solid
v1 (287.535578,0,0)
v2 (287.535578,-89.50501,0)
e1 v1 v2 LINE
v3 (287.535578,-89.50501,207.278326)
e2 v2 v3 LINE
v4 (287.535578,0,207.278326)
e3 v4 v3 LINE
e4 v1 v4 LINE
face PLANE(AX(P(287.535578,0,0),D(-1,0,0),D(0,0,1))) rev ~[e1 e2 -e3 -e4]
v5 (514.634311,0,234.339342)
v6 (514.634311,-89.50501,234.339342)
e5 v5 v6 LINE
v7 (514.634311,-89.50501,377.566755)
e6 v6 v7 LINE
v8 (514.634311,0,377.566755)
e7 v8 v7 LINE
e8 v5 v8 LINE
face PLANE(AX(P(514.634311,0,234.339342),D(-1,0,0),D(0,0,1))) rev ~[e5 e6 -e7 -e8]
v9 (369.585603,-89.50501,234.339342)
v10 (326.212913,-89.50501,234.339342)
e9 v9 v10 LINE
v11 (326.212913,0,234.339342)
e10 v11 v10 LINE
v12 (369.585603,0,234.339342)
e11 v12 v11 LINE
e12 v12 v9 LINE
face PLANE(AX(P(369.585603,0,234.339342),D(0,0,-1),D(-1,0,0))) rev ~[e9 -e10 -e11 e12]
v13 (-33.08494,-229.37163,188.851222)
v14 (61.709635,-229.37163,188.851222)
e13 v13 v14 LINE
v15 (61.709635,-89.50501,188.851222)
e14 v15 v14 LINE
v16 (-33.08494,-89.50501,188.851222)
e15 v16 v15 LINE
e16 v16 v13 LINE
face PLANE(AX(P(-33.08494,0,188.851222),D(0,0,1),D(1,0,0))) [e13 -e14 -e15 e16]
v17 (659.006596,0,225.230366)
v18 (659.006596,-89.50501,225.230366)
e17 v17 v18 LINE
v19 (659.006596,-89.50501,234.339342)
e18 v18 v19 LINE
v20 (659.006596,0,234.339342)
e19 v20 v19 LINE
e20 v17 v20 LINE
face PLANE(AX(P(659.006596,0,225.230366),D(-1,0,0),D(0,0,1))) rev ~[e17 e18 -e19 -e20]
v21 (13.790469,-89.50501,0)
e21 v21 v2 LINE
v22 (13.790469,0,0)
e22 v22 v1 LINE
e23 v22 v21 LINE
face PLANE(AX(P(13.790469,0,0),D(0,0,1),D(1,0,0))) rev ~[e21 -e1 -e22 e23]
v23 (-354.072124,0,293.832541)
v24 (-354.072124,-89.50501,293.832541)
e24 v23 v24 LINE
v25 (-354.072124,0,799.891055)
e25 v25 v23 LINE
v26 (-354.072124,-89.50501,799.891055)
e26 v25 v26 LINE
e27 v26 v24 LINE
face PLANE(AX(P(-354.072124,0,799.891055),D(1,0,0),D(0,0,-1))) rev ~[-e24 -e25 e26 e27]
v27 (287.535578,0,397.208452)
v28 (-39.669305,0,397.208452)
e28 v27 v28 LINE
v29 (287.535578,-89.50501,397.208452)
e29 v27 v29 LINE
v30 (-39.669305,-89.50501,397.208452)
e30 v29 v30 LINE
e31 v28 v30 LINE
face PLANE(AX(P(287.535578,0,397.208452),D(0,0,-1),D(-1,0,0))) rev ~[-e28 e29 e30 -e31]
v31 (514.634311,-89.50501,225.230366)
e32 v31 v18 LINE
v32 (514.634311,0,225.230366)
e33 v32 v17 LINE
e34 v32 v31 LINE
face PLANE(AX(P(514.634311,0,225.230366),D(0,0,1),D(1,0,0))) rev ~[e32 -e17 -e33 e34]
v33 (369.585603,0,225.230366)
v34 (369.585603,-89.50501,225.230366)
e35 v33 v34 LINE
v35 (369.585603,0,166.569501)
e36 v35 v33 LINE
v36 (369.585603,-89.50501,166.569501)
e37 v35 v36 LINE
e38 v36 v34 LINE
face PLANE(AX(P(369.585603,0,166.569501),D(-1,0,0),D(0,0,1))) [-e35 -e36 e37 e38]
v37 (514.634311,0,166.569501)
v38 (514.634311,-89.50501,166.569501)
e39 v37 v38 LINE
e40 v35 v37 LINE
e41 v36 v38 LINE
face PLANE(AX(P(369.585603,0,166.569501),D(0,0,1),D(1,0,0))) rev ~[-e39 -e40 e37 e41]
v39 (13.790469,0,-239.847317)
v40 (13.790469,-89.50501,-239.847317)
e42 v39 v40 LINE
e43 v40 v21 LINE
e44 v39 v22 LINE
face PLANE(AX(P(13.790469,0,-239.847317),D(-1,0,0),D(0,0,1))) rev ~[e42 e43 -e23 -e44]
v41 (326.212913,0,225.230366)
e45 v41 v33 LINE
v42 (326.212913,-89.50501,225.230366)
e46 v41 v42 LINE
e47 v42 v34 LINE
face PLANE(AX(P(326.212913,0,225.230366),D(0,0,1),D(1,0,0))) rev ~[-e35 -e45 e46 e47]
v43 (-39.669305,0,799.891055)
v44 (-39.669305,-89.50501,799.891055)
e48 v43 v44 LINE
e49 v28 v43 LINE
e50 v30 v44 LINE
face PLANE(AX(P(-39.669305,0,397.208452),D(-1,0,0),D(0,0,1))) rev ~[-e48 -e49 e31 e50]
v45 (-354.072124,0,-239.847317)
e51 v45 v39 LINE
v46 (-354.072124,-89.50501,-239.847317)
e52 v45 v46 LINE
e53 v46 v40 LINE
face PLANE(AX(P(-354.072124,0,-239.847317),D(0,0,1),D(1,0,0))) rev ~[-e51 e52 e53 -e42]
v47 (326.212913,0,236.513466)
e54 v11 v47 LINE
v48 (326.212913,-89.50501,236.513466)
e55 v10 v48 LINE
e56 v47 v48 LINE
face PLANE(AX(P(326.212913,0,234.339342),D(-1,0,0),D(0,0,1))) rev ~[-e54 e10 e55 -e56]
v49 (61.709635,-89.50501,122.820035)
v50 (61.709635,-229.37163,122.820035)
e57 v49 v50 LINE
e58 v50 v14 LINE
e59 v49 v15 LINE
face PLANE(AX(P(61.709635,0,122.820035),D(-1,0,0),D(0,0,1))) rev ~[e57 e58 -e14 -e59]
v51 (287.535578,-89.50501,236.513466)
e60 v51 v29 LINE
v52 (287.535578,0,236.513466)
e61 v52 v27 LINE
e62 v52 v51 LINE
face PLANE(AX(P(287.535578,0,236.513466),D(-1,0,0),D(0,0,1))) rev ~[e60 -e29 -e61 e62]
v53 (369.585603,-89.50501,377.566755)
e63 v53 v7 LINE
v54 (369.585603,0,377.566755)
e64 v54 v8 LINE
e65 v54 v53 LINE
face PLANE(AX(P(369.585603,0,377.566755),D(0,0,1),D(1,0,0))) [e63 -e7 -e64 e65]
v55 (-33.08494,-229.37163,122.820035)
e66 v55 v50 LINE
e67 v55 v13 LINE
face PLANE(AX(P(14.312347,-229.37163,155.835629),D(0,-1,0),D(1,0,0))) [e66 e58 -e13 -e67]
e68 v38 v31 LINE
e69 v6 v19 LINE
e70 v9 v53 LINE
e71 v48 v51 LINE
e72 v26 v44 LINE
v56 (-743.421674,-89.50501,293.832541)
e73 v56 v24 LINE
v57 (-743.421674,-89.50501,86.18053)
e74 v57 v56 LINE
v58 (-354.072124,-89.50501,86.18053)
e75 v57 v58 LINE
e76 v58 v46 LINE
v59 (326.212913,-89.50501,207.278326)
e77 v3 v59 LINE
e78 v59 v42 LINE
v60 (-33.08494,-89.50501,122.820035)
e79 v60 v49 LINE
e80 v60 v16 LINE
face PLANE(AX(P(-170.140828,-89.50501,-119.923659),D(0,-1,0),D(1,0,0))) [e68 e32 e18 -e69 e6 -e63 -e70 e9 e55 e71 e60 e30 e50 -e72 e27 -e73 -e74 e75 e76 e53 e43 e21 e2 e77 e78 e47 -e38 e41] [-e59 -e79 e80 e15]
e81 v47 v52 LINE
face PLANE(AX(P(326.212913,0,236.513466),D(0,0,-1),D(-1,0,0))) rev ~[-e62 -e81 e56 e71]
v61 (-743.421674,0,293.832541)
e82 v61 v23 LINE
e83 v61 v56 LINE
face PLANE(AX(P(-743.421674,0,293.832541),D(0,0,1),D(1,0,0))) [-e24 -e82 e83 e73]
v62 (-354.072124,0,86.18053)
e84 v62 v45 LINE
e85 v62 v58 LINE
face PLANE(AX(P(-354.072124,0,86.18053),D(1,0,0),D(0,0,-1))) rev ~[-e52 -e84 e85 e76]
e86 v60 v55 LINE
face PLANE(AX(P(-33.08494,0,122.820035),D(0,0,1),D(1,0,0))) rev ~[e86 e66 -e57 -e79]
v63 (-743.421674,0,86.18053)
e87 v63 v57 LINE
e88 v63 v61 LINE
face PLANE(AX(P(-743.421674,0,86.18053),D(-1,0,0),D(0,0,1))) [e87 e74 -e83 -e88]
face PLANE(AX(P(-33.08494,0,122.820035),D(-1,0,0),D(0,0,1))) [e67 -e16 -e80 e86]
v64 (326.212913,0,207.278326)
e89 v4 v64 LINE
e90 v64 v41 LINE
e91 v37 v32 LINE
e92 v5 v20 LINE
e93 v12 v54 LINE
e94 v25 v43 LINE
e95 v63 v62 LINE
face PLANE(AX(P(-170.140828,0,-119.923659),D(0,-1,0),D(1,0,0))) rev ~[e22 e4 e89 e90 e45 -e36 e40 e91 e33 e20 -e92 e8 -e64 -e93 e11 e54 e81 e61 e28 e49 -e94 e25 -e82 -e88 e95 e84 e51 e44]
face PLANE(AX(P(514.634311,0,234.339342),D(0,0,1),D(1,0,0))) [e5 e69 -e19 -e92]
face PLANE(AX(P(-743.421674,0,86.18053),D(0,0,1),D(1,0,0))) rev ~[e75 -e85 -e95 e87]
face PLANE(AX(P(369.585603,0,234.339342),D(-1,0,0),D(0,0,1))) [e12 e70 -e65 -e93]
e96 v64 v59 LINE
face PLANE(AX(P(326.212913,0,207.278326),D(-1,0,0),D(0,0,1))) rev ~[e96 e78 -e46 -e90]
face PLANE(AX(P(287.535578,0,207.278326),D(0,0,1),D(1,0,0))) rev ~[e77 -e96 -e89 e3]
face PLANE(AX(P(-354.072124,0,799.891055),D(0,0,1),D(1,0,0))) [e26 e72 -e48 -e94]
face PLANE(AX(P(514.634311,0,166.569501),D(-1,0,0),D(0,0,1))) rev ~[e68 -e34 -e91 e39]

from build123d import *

# Parameters (mm, degrees)
F0_W     = 94.794575125
F0_H     = 66.0311877728
F1_DEPTH = 229.37163
F2_W     = 367.8625924513
F2_H     = 239.847317338
F2_W_2   = 389.3495500088
F2_H_2   = 207.6520100236
F2_W_3   = 314.4028186798
F2_H_3   = 402.6826024055
F2_W_4   = 43.3726906776
F2_H_4   = 9.1089755297
F2_W_5   = 145.0487077236
F2_H_5   = 58.66086483
F2_H_6   = 143.2274132967
F2_W_6   = 144.3722844124
F3_DEPTH = 89.50501


with BuildPart() as f1:
    # F0 (on Front) → F1 (new body)
    with BuildSketch(Plane.XZ):
        with Locations((14.3123473972, 155.8356285095)):
            Rectangle(F0_W, F0_H)
    extrude(amount=F1_DEPTH)

    # F2 (on Front) → F3 (join)
    with BuildSketch(Plane.XZ):
        with Locations((-170.1408275403, -119.923658669)):
            Rectangle(F2_W, F2_H)
        Polygon((-354.0721237659, 0), (13.7904686853, 0), (287.5355780125, 0), (287.5355780125, 207.2783261538), (287.5355780125, 236.5134656429), (287.5355780125, 397.2084522247), (-39.6693050861, 397.2084522247), (-354.0721237659, 397.2084522247), (-354.0721237659, 293.8325405121), (-354.0721237659, 86.1805304885), align=None)
        with Locations((-548.7468987703, 190.0065355003)):
            Rectangle(F2_W_2, F2_H_2)
        Polygon((287.5355780125, 236.5134656429), (287.5355780125, 207.2783261538), (326.2129127979, 207.2783261538), (326.2129127979, 225.2303659916), (326.2129127979, 234.3393415213), (326.2129127979, 236.5134656429), align=None)
        with Locations((-196.870714426, 598.5497534275)):
            Rectangle(F2_W_3, F2_H_3)
        with Locations((347.8992581367, 229.7848537564)):
            Rectangle(F2_W_4, F2_H_4)
        with Locations((442.1099573374, 229.7848537564)):
            Rectangle(F2_W_5, F2_H_4)
        with Locations((442.1099573374, 195.8999335766)):
            Rectangle(F2_W_5, F2_H_5)
        with Locations((442.1099573374, 305.9530481696)):
            Rectangle(F2_W_5, F2_H_6)
        with Locations((586.8204534054, 229.7848537564)):
            Rectangle(F2_W_6, F2_H_4)
    extrude(amount=F3_DEPTH)


solid = f1.part
